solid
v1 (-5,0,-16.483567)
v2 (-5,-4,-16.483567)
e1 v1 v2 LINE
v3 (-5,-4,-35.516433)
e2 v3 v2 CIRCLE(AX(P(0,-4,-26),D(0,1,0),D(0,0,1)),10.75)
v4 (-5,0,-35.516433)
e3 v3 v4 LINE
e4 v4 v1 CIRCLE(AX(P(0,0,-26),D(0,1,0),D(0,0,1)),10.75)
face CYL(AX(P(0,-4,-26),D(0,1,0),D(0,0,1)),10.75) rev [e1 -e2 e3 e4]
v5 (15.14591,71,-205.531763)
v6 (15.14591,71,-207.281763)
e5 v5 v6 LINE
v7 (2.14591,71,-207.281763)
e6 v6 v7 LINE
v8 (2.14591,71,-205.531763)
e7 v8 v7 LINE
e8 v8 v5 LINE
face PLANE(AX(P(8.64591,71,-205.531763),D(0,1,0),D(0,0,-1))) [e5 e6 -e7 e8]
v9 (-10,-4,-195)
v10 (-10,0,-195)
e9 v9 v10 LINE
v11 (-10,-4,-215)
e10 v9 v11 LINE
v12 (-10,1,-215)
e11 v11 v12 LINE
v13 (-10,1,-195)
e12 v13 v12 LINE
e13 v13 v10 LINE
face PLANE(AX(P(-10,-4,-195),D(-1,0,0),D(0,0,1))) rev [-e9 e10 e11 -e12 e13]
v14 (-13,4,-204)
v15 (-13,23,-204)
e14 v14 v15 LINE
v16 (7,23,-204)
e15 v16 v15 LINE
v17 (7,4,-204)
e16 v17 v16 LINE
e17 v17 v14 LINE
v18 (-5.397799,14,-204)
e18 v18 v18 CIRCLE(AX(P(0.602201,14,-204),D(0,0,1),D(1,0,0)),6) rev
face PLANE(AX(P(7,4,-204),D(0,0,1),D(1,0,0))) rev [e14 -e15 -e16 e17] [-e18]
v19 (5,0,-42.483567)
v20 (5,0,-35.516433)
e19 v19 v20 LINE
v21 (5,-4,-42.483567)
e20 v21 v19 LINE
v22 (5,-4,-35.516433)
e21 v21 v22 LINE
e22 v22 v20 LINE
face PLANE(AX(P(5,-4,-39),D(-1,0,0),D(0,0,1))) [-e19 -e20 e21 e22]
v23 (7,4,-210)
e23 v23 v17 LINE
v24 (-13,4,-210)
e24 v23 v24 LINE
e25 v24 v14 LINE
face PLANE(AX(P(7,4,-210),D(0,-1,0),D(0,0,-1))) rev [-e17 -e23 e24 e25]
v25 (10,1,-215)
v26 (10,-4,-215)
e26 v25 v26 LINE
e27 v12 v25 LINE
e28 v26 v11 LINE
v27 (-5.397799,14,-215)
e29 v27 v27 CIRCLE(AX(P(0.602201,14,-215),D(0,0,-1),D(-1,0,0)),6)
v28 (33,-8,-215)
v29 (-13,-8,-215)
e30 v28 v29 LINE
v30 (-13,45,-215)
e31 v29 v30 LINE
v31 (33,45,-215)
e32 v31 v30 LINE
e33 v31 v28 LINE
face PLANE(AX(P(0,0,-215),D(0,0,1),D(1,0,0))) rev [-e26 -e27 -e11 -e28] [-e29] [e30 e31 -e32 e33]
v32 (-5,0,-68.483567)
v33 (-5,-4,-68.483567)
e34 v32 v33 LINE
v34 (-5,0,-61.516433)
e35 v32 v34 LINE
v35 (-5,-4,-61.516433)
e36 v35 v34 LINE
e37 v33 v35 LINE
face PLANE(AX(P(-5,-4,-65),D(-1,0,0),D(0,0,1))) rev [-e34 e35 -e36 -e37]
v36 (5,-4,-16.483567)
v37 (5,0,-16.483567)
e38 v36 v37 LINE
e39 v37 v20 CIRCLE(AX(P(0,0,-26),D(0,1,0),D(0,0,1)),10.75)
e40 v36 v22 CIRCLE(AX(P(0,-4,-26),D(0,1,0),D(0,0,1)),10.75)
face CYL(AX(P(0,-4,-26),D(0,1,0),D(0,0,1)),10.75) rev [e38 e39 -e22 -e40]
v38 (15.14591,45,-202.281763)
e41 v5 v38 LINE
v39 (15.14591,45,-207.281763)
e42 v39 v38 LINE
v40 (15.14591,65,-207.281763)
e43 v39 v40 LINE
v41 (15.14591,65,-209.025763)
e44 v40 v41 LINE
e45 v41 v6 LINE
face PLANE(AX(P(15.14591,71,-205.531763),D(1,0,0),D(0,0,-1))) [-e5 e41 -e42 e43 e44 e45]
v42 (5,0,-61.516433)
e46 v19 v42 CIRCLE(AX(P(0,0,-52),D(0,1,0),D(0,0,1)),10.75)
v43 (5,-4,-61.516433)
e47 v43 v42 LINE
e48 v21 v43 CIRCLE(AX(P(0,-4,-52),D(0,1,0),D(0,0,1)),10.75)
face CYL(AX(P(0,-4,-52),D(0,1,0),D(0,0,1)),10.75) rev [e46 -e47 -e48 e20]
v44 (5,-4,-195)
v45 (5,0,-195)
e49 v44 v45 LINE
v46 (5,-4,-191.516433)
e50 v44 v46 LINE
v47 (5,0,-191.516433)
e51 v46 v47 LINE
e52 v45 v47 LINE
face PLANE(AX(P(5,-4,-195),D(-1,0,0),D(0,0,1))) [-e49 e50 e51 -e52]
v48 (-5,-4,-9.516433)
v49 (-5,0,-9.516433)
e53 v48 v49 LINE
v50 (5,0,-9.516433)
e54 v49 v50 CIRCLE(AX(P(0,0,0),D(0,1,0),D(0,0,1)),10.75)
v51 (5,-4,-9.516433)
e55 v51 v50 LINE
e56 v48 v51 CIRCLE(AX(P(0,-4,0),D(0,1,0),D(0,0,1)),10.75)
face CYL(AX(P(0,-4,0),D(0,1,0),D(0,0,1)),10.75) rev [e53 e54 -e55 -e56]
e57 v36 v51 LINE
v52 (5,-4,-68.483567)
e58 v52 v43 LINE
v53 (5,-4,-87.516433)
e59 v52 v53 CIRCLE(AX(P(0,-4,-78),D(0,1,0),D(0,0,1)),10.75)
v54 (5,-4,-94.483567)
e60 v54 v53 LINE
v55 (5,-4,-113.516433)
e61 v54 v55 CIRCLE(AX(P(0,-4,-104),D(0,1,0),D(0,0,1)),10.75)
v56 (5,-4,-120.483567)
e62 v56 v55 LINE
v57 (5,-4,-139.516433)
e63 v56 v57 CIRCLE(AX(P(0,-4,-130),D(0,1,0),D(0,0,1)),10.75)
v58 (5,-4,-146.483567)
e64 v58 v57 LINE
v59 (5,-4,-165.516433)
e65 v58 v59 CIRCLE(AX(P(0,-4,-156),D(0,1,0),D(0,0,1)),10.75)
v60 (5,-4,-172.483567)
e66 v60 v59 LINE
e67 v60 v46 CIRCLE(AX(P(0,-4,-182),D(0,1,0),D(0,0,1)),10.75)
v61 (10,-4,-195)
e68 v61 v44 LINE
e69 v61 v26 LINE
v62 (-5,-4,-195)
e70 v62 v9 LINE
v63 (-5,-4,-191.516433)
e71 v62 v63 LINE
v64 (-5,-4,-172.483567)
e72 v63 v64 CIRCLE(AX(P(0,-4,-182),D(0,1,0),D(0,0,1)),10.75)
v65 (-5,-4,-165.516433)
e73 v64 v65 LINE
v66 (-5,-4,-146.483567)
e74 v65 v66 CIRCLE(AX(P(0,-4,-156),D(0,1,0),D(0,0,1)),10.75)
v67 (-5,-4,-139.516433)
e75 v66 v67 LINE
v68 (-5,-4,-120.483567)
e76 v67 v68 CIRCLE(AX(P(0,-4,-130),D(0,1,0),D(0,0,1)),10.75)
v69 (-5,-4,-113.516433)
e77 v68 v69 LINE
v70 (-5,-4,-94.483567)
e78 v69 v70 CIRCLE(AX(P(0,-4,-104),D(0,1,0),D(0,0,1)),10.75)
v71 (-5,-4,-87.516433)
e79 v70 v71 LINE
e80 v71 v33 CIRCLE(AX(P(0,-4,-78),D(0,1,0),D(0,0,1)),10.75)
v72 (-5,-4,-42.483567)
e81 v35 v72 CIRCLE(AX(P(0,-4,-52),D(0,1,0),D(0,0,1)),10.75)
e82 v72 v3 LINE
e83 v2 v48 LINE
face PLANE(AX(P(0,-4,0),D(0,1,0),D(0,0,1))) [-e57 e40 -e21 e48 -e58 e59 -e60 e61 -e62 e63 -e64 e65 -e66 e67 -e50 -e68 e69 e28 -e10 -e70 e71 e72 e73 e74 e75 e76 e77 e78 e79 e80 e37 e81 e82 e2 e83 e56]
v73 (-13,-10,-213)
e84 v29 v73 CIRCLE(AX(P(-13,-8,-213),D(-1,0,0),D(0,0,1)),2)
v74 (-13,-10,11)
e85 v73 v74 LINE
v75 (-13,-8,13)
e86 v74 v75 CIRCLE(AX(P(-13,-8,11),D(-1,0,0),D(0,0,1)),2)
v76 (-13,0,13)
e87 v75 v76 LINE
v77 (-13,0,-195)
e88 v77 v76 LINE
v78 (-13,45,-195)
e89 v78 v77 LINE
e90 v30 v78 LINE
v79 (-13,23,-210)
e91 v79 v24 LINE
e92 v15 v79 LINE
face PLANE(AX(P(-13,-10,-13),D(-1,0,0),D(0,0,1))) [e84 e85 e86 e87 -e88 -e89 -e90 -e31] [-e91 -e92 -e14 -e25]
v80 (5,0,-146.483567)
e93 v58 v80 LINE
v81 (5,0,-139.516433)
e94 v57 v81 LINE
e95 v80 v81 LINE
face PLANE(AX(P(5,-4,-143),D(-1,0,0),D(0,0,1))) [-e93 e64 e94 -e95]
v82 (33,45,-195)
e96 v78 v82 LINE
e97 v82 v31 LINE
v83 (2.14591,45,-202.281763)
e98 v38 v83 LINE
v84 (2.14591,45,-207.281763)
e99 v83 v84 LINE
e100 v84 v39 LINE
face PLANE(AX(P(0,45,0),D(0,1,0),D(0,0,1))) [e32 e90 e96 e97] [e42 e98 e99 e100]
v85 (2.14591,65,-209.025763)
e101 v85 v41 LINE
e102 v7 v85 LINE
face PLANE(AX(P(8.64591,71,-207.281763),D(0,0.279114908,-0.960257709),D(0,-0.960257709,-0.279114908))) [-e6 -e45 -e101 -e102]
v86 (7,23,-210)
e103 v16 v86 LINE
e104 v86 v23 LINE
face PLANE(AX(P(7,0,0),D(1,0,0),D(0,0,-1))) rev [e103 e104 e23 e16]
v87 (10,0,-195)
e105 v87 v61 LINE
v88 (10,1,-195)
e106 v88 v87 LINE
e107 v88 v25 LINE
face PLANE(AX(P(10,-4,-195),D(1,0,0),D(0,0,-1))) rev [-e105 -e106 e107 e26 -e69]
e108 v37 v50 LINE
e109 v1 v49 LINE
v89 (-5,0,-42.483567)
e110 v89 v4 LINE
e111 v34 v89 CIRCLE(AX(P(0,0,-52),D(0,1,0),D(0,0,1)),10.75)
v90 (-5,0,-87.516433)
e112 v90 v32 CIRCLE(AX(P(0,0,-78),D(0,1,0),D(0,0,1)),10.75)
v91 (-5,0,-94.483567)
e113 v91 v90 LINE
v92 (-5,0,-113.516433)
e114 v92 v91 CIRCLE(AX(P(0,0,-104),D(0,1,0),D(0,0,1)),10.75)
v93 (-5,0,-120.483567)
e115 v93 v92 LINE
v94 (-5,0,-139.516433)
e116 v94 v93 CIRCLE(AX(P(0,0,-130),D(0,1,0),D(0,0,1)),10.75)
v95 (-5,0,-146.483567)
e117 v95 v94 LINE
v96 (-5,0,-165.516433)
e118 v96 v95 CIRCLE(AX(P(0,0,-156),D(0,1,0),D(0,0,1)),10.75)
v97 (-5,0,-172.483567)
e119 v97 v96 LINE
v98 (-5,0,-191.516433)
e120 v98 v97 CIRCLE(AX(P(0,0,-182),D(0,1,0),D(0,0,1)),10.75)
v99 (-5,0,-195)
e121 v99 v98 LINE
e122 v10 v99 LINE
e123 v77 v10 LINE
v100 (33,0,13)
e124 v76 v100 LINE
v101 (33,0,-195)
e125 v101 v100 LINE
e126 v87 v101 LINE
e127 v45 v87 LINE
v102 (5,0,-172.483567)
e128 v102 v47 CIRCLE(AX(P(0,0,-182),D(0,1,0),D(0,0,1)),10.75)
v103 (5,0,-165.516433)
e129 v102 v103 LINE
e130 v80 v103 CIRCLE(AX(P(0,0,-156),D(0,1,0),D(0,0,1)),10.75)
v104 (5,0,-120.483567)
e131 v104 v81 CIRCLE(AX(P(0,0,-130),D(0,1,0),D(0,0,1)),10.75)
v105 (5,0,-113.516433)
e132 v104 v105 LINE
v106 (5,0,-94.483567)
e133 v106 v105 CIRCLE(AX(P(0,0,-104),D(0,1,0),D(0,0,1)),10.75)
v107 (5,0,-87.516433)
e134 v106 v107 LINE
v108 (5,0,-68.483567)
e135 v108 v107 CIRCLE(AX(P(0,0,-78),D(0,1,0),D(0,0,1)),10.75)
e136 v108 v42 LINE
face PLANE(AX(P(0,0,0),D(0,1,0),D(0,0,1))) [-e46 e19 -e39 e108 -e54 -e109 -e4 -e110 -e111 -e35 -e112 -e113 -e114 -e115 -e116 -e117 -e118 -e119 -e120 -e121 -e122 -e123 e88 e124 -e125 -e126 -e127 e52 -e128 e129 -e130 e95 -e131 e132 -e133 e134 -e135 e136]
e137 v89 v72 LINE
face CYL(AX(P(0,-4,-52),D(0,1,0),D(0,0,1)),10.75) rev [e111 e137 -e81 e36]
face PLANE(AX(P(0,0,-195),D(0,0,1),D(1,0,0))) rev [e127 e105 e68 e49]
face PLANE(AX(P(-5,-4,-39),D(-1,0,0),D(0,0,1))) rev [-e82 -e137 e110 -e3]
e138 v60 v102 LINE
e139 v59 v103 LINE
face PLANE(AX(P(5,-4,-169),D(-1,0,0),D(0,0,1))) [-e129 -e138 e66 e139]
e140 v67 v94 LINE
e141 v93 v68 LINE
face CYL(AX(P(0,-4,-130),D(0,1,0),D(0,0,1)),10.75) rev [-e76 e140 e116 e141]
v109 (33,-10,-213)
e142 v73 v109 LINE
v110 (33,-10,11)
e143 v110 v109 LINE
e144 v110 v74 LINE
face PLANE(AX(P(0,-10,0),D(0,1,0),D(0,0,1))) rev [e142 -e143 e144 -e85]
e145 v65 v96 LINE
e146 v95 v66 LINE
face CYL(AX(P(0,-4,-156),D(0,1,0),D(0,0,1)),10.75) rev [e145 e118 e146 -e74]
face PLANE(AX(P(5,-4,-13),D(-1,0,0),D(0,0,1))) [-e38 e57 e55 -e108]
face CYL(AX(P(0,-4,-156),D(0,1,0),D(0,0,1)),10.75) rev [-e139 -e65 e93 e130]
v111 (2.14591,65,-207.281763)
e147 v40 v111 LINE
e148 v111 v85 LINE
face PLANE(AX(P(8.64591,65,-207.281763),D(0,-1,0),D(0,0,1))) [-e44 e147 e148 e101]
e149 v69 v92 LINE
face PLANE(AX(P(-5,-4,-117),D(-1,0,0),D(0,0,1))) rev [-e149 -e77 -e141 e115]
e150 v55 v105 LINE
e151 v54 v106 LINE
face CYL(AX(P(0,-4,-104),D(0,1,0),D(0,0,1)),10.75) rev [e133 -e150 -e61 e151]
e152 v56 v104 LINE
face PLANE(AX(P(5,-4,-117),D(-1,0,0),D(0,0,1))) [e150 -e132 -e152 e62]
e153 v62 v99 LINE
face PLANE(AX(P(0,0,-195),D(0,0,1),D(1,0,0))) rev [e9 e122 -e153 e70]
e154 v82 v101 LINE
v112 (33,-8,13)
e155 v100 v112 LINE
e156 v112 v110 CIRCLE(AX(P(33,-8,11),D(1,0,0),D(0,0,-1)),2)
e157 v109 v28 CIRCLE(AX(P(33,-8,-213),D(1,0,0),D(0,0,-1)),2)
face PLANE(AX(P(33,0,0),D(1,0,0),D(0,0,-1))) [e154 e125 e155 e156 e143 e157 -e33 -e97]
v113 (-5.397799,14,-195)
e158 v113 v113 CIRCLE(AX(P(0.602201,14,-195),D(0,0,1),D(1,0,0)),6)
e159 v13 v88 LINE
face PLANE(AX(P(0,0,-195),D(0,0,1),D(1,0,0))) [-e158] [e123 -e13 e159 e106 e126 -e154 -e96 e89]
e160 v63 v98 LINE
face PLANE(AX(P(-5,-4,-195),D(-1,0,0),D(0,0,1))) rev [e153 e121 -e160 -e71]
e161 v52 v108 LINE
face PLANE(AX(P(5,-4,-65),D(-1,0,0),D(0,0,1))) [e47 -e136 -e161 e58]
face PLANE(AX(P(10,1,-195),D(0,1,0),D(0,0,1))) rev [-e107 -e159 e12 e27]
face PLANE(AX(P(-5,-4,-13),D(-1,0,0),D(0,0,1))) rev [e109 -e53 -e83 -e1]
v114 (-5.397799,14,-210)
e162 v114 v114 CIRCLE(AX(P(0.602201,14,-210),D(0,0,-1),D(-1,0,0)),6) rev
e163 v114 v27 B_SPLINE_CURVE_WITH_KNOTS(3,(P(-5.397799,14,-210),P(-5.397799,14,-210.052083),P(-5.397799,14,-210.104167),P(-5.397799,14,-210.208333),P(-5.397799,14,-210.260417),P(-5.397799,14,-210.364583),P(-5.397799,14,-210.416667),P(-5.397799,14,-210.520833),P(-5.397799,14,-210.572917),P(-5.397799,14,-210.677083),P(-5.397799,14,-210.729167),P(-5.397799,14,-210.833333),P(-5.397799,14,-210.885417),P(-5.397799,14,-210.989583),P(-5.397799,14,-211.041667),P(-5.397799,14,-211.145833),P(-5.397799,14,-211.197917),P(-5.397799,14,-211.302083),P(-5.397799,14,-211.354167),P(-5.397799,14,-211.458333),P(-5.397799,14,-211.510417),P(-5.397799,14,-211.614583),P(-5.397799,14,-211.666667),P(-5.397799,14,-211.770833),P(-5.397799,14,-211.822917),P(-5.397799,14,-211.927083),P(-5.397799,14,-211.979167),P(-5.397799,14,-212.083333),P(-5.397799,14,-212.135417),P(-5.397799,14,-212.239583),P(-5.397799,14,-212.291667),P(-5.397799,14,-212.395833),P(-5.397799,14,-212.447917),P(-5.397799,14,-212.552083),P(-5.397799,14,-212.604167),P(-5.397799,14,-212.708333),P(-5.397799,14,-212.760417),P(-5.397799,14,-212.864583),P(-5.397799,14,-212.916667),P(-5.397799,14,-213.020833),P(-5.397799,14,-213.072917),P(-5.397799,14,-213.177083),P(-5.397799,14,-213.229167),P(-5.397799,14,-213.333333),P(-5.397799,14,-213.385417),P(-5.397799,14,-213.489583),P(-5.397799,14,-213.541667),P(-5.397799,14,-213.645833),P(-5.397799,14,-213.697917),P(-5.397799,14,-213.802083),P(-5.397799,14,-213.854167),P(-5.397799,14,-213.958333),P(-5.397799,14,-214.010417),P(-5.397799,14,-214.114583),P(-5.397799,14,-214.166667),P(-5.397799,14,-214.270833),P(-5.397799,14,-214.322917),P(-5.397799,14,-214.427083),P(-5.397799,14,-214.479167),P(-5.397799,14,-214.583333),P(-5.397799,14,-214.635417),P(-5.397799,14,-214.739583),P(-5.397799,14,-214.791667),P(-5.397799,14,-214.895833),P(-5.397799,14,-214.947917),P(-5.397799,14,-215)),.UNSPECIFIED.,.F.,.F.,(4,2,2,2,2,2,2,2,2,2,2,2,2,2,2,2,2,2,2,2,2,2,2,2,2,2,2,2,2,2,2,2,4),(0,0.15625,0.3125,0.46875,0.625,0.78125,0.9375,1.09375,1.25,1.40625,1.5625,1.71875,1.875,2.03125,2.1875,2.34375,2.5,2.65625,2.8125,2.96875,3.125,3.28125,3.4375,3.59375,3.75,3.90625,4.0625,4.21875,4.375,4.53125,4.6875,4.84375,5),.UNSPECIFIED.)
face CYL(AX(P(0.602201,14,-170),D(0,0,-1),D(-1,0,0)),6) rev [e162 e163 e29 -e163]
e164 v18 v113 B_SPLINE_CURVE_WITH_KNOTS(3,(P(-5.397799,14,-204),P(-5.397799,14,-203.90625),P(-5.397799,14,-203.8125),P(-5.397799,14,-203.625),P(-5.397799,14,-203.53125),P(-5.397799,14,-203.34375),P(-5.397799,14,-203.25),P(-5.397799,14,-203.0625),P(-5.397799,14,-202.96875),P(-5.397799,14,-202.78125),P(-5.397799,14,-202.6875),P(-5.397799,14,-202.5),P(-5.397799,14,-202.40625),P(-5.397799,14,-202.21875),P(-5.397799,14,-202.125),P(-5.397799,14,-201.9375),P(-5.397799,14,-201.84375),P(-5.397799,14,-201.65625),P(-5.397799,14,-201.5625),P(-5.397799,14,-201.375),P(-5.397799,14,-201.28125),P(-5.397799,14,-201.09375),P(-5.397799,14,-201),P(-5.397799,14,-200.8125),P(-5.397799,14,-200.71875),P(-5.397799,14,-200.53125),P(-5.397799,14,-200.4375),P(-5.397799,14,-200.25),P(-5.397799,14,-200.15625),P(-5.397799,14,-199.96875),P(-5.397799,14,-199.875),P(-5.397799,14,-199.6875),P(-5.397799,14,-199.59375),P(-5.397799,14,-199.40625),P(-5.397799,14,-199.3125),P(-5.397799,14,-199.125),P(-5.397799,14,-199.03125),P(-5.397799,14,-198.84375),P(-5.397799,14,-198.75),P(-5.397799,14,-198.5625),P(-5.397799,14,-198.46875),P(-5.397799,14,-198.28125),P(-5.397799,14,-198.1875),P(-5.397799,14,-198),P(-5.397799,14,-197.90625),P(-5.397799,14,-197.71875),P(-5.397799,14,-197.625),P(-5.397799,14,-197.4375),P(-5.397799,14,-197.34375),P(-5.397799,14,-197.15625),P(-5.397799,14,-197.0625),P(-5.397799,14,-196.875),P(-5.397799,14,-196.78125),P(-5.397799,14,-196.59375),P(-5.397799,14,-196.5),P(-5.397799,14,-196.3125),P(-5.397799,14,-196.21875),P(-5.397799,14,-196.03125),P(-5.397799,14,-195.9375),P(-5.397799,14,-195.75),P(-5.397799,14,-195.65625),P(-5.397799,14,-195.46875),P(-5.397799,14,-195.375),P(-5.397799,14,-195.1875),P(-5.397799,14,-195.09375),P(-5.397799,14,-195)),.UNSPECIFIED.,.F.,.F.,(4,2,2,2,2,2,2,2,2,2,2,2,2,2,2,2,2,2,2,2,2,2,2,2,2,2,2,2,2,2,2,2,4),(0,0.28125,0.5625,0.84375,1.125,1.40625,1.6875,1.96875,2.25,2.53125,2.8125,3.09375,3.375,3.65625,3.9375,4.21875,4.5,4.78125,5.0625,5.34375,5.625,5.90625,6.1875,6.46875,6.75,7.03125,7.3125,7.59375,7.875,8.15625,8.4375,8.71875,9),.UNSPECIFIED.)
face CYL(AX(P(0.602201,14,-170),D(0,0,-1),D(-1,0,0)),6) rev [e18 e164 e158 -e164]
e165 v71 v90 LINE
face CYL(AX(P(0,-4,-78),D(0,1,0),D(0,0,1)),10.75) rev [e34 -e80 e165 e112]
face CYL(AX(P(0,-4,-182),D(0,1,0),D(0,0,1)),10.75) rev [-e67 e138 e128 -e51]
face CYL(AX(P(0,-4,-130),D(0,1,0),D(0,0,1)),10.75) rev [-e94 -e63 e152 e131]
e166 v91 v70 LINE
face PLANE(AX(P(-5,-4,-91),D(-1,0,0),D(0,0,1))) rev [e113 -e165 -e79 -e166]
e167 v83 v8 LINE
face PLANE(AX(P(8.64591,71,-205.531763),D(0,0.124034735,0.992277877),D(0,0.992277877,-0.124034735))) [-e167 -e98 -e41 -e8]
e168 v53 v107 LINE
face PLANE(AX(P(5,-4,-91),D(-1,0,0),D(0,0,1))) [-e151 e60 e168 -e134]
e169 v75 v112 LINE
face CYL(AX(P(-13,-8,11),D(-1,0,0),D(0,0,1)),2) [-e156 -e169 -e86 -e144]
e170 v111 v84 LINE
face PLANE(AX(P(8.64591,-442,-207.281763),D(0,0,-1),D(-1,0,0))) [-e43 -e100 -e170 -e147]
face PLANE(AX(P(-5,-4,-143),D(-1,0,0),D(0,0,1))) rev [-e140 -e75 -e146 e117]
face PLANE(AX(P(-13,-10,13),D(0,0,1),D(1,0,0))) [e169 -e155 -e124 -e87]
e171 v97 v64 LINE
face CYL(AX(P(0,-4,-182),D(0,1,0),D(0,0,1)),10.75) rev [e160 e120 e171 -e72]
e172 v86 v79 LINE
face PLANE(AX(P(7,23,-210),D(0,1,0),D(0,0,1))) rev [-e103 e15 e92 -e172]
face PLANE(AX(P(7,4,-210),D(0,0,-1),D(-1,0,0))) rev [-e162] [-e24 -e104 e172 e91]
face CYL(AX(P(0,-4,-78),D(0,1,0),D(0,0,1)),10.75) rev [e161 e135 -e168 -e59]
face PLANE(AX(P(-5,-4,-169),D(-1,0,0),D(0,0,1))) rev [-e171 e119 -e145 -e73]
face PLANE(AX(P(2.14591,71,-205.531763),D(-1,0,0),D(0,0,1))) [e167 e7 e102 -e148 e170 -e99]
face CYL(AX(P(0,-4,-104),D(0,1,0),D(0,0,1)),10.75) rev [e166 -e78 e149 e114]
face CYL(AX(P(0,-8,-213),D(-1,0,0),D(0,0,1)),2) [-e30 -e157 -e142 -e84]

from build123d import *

# Parameters (mm, degrees)
SKETCH5_W           = 26
SKETCH5_H           = 26
BOSS_EXTRUDE1_DEPTH = 10
SKETCH4_R           = 10.75
CUT_EXTRUDE1_DEPTH  = 4
SKETCH6_W           = 10
SKETCH6_H           = 3.483566845
CUT_EXTRUDE2_DEPTH  = 4
LPATTERN1_COUNT     = 8
LPATTERN1_PITCH     = 26
SKETCH7_W           = 10
SKETCH7_H           = 4
CUT_EXTRUDE3_DEPTH  = 183.737516674
SKETCH12_W          = 208
SKETCH12_H          = 10
BOSS_EXTRUDE3_DEPTH = 20
SKETCH14_W          = 46
SKETCH14_H          = 10
BOSS_EXTRUDE4_DEPTH = 20
SKETCH15_W          = 46
SKETCH15_H          = 20
BOSS_EXTRUDE5_DEPTH = 45
SKETCH16_W          = 20
SKETCH16_H          = 5
CUT_EXTRUDE5_DEPTH  = 20
SKETCH17_R          = 6
CUT_EXTRUDE6_DEPTH  = 45
SKETCH18_W          = 6
SKETCH18_H          = 19
CUT_EXTRUDE7_DEPTH  = 20
SNAP_START          = 2.145910006
SNAP_HOOK1_DEPTH    = 13
FILLET2_R           = 2


# Read off the part's stored shape, not the designer's step: Snap Hook1
with BuildPart() as part:
    # Sketch5 → Boss-Extrude1 (new body)
    with BuildSketch(Plane(origin=(0, 0, 0), x_dir=(1, 0, 0), z_dir=(0, 1, 0))):
        Rectangle(SKETCH5_W, SKETCH5_H)
    boss_extrude1 = extrude(amount=-BOSS_EXTRUDE1_DEPTH)

    # Sketch4 → Cut-Extrude1 (cut)
    with BuildSketch(Plane(origin=(0, 0, 0), x_dir=(1, 0, 0), z_dir=(0, 1, 0))):
        with Locations(Location((0, 0, 0), (0, 0, 270))):
            Circle(SKETCH4_R)
    cut_extrude1 = extrude(amount=-CUT_EXTRUDE1_DEPTH, mode=Mode.SUBTRACT)

    # Sketch6 → Cut-Extrude2 (cut)
    with BuildSketch(Plane(origin=(0, 0, 0), x_dir=(1, 0, 0), z_dir=(0, 1, 0))):
        with Locations((0, 11.258216578)):
            Rectangle(SKETCH6_W, SKETCH6_H)
    cut_extrude2 = extrude(amount=-CUT_EXTRUDE2_DEPTH, mode=Mode.SUBTRACT)

    # LPattern1: Boss-Extrude1, Cut-Extrude1, Cut-Extrude2 ×8
    with Locations(*[(0, 0, -i * LPATTERN1_PITCH) for i in range(1, LPATTERN1_COUNT)]):
        add(boss_extrude1)
        add(cut_extrude1, mode=Mode.SUBTRACT)
        add(cut_extrude2, mode=Mode.SUBTRACT)

    # Sketch7 → Cut-Extrude3 (cut, through all)
    with BuildSketch(Plane.XY.offset(-13)):
        with Locations((0, -2)):
            Rectangle(SKETCH7_W, SKETCH7_H)
    extrude(amount=-CUT_EXTRUDE3_DEPTH, mode=Mode.SUBTRACT)

    # Sketch12 → Boss-Extrude3 (add)
    with BuildSketch(Plane(origin=(13, 0, 0), x_dir=(0, 0, -1), z_dir=(1, 0, 0))):
        with Locations((91, -5)):
            Rectangle(SKETCH12_W, SKETCH12_H)
    extrude(amount=BOSS_EXTRUDE3_DEPTH)

    # Sketch14 → Boss-Extrude4 (add)
    with BuildSketch(Plane(origin=(0, 0, -195), x_dir=(-1, 0, 0), z_dir=(0, 0, -1))):
        with Locations((-10, -5)):
            Rectangle(SKETCH14_W, SKETCH14_H)
    extrude(amount=BOSS_EXTRUDE4_DEPTH)

    # Sketch15 → Boss-Extrude5 (add)
    with BuildSketch(Plane(origin=(0, 0, 0), x_dir=(1, 0, 0), z_dir=(0, 1, 0))):
        with Locations((10, 205)):
            Rectangle(SKETCH15_W, SKETCH15_H)
    extrude(amount=BOSS_EXTRUDE5_DEPTH)

    # Sketch16 → Cut-Extrude5 (cut)
    with BuildSketch(Plane(origin=(0, 0, -215), x_dir=(-1, 0, 0), z_dir=(0, 0, -1))):
        with Locations((0, -1.5)):
            Rectangle(SKETCH16_W, SKETCH16_H)
    extrude(amount=-CUT_EXTRUDE5_DEPTH, mode=Mode.SUBTRACT)

    # Sketch17 → Cut-Extrude6 (cut)
    with BuildSketch(Plane(origin=(0, 0, -215), x_dir=(-1, 0, 0), z_dir=(0, 0, -1))):
        with Locations((-0.602201255, 14)):
            Circle(SKETCH17_R)
    extrude(amount=-CUT_EXTRUDE6_DEPTH, mode=Mode.SUBTRACT)

    # Sketch18 → Cut-Extrude7 (cut)
    with BuildSketch(Plane.ZY.offset(13)):
        with Locations((-207, 13.5)):
            Rectangle(SKETCH18_W, SKETCH18_H)
    extrude(amount=-CUT_EXTRUDE7_DEPTH, mode=Mode.SUBTRACT)

    # Snap Hook1 outline → Snap Hook1 (add)
    with BuildSketch(Plane.YZ.offset(SNAP_START)):
        Polygon((45, -207.281762619), (65, -207.281762619), (65, -209.025762619), (71, -207.281762619), (71, -205.531762619), (45, -202.281762619), align=None)
    extrude(amount=SNAP_HOOK1_DEPTH)

    # Fillet2
    fillet2_edges = [part.edges().sort_by_distance(p)[0] for p in [
        (10, -10, -215),
        (10, -10, 13),
    ]]
    fillet(fillet2_edges, radius=FILLET2_R)


solid = part.part
